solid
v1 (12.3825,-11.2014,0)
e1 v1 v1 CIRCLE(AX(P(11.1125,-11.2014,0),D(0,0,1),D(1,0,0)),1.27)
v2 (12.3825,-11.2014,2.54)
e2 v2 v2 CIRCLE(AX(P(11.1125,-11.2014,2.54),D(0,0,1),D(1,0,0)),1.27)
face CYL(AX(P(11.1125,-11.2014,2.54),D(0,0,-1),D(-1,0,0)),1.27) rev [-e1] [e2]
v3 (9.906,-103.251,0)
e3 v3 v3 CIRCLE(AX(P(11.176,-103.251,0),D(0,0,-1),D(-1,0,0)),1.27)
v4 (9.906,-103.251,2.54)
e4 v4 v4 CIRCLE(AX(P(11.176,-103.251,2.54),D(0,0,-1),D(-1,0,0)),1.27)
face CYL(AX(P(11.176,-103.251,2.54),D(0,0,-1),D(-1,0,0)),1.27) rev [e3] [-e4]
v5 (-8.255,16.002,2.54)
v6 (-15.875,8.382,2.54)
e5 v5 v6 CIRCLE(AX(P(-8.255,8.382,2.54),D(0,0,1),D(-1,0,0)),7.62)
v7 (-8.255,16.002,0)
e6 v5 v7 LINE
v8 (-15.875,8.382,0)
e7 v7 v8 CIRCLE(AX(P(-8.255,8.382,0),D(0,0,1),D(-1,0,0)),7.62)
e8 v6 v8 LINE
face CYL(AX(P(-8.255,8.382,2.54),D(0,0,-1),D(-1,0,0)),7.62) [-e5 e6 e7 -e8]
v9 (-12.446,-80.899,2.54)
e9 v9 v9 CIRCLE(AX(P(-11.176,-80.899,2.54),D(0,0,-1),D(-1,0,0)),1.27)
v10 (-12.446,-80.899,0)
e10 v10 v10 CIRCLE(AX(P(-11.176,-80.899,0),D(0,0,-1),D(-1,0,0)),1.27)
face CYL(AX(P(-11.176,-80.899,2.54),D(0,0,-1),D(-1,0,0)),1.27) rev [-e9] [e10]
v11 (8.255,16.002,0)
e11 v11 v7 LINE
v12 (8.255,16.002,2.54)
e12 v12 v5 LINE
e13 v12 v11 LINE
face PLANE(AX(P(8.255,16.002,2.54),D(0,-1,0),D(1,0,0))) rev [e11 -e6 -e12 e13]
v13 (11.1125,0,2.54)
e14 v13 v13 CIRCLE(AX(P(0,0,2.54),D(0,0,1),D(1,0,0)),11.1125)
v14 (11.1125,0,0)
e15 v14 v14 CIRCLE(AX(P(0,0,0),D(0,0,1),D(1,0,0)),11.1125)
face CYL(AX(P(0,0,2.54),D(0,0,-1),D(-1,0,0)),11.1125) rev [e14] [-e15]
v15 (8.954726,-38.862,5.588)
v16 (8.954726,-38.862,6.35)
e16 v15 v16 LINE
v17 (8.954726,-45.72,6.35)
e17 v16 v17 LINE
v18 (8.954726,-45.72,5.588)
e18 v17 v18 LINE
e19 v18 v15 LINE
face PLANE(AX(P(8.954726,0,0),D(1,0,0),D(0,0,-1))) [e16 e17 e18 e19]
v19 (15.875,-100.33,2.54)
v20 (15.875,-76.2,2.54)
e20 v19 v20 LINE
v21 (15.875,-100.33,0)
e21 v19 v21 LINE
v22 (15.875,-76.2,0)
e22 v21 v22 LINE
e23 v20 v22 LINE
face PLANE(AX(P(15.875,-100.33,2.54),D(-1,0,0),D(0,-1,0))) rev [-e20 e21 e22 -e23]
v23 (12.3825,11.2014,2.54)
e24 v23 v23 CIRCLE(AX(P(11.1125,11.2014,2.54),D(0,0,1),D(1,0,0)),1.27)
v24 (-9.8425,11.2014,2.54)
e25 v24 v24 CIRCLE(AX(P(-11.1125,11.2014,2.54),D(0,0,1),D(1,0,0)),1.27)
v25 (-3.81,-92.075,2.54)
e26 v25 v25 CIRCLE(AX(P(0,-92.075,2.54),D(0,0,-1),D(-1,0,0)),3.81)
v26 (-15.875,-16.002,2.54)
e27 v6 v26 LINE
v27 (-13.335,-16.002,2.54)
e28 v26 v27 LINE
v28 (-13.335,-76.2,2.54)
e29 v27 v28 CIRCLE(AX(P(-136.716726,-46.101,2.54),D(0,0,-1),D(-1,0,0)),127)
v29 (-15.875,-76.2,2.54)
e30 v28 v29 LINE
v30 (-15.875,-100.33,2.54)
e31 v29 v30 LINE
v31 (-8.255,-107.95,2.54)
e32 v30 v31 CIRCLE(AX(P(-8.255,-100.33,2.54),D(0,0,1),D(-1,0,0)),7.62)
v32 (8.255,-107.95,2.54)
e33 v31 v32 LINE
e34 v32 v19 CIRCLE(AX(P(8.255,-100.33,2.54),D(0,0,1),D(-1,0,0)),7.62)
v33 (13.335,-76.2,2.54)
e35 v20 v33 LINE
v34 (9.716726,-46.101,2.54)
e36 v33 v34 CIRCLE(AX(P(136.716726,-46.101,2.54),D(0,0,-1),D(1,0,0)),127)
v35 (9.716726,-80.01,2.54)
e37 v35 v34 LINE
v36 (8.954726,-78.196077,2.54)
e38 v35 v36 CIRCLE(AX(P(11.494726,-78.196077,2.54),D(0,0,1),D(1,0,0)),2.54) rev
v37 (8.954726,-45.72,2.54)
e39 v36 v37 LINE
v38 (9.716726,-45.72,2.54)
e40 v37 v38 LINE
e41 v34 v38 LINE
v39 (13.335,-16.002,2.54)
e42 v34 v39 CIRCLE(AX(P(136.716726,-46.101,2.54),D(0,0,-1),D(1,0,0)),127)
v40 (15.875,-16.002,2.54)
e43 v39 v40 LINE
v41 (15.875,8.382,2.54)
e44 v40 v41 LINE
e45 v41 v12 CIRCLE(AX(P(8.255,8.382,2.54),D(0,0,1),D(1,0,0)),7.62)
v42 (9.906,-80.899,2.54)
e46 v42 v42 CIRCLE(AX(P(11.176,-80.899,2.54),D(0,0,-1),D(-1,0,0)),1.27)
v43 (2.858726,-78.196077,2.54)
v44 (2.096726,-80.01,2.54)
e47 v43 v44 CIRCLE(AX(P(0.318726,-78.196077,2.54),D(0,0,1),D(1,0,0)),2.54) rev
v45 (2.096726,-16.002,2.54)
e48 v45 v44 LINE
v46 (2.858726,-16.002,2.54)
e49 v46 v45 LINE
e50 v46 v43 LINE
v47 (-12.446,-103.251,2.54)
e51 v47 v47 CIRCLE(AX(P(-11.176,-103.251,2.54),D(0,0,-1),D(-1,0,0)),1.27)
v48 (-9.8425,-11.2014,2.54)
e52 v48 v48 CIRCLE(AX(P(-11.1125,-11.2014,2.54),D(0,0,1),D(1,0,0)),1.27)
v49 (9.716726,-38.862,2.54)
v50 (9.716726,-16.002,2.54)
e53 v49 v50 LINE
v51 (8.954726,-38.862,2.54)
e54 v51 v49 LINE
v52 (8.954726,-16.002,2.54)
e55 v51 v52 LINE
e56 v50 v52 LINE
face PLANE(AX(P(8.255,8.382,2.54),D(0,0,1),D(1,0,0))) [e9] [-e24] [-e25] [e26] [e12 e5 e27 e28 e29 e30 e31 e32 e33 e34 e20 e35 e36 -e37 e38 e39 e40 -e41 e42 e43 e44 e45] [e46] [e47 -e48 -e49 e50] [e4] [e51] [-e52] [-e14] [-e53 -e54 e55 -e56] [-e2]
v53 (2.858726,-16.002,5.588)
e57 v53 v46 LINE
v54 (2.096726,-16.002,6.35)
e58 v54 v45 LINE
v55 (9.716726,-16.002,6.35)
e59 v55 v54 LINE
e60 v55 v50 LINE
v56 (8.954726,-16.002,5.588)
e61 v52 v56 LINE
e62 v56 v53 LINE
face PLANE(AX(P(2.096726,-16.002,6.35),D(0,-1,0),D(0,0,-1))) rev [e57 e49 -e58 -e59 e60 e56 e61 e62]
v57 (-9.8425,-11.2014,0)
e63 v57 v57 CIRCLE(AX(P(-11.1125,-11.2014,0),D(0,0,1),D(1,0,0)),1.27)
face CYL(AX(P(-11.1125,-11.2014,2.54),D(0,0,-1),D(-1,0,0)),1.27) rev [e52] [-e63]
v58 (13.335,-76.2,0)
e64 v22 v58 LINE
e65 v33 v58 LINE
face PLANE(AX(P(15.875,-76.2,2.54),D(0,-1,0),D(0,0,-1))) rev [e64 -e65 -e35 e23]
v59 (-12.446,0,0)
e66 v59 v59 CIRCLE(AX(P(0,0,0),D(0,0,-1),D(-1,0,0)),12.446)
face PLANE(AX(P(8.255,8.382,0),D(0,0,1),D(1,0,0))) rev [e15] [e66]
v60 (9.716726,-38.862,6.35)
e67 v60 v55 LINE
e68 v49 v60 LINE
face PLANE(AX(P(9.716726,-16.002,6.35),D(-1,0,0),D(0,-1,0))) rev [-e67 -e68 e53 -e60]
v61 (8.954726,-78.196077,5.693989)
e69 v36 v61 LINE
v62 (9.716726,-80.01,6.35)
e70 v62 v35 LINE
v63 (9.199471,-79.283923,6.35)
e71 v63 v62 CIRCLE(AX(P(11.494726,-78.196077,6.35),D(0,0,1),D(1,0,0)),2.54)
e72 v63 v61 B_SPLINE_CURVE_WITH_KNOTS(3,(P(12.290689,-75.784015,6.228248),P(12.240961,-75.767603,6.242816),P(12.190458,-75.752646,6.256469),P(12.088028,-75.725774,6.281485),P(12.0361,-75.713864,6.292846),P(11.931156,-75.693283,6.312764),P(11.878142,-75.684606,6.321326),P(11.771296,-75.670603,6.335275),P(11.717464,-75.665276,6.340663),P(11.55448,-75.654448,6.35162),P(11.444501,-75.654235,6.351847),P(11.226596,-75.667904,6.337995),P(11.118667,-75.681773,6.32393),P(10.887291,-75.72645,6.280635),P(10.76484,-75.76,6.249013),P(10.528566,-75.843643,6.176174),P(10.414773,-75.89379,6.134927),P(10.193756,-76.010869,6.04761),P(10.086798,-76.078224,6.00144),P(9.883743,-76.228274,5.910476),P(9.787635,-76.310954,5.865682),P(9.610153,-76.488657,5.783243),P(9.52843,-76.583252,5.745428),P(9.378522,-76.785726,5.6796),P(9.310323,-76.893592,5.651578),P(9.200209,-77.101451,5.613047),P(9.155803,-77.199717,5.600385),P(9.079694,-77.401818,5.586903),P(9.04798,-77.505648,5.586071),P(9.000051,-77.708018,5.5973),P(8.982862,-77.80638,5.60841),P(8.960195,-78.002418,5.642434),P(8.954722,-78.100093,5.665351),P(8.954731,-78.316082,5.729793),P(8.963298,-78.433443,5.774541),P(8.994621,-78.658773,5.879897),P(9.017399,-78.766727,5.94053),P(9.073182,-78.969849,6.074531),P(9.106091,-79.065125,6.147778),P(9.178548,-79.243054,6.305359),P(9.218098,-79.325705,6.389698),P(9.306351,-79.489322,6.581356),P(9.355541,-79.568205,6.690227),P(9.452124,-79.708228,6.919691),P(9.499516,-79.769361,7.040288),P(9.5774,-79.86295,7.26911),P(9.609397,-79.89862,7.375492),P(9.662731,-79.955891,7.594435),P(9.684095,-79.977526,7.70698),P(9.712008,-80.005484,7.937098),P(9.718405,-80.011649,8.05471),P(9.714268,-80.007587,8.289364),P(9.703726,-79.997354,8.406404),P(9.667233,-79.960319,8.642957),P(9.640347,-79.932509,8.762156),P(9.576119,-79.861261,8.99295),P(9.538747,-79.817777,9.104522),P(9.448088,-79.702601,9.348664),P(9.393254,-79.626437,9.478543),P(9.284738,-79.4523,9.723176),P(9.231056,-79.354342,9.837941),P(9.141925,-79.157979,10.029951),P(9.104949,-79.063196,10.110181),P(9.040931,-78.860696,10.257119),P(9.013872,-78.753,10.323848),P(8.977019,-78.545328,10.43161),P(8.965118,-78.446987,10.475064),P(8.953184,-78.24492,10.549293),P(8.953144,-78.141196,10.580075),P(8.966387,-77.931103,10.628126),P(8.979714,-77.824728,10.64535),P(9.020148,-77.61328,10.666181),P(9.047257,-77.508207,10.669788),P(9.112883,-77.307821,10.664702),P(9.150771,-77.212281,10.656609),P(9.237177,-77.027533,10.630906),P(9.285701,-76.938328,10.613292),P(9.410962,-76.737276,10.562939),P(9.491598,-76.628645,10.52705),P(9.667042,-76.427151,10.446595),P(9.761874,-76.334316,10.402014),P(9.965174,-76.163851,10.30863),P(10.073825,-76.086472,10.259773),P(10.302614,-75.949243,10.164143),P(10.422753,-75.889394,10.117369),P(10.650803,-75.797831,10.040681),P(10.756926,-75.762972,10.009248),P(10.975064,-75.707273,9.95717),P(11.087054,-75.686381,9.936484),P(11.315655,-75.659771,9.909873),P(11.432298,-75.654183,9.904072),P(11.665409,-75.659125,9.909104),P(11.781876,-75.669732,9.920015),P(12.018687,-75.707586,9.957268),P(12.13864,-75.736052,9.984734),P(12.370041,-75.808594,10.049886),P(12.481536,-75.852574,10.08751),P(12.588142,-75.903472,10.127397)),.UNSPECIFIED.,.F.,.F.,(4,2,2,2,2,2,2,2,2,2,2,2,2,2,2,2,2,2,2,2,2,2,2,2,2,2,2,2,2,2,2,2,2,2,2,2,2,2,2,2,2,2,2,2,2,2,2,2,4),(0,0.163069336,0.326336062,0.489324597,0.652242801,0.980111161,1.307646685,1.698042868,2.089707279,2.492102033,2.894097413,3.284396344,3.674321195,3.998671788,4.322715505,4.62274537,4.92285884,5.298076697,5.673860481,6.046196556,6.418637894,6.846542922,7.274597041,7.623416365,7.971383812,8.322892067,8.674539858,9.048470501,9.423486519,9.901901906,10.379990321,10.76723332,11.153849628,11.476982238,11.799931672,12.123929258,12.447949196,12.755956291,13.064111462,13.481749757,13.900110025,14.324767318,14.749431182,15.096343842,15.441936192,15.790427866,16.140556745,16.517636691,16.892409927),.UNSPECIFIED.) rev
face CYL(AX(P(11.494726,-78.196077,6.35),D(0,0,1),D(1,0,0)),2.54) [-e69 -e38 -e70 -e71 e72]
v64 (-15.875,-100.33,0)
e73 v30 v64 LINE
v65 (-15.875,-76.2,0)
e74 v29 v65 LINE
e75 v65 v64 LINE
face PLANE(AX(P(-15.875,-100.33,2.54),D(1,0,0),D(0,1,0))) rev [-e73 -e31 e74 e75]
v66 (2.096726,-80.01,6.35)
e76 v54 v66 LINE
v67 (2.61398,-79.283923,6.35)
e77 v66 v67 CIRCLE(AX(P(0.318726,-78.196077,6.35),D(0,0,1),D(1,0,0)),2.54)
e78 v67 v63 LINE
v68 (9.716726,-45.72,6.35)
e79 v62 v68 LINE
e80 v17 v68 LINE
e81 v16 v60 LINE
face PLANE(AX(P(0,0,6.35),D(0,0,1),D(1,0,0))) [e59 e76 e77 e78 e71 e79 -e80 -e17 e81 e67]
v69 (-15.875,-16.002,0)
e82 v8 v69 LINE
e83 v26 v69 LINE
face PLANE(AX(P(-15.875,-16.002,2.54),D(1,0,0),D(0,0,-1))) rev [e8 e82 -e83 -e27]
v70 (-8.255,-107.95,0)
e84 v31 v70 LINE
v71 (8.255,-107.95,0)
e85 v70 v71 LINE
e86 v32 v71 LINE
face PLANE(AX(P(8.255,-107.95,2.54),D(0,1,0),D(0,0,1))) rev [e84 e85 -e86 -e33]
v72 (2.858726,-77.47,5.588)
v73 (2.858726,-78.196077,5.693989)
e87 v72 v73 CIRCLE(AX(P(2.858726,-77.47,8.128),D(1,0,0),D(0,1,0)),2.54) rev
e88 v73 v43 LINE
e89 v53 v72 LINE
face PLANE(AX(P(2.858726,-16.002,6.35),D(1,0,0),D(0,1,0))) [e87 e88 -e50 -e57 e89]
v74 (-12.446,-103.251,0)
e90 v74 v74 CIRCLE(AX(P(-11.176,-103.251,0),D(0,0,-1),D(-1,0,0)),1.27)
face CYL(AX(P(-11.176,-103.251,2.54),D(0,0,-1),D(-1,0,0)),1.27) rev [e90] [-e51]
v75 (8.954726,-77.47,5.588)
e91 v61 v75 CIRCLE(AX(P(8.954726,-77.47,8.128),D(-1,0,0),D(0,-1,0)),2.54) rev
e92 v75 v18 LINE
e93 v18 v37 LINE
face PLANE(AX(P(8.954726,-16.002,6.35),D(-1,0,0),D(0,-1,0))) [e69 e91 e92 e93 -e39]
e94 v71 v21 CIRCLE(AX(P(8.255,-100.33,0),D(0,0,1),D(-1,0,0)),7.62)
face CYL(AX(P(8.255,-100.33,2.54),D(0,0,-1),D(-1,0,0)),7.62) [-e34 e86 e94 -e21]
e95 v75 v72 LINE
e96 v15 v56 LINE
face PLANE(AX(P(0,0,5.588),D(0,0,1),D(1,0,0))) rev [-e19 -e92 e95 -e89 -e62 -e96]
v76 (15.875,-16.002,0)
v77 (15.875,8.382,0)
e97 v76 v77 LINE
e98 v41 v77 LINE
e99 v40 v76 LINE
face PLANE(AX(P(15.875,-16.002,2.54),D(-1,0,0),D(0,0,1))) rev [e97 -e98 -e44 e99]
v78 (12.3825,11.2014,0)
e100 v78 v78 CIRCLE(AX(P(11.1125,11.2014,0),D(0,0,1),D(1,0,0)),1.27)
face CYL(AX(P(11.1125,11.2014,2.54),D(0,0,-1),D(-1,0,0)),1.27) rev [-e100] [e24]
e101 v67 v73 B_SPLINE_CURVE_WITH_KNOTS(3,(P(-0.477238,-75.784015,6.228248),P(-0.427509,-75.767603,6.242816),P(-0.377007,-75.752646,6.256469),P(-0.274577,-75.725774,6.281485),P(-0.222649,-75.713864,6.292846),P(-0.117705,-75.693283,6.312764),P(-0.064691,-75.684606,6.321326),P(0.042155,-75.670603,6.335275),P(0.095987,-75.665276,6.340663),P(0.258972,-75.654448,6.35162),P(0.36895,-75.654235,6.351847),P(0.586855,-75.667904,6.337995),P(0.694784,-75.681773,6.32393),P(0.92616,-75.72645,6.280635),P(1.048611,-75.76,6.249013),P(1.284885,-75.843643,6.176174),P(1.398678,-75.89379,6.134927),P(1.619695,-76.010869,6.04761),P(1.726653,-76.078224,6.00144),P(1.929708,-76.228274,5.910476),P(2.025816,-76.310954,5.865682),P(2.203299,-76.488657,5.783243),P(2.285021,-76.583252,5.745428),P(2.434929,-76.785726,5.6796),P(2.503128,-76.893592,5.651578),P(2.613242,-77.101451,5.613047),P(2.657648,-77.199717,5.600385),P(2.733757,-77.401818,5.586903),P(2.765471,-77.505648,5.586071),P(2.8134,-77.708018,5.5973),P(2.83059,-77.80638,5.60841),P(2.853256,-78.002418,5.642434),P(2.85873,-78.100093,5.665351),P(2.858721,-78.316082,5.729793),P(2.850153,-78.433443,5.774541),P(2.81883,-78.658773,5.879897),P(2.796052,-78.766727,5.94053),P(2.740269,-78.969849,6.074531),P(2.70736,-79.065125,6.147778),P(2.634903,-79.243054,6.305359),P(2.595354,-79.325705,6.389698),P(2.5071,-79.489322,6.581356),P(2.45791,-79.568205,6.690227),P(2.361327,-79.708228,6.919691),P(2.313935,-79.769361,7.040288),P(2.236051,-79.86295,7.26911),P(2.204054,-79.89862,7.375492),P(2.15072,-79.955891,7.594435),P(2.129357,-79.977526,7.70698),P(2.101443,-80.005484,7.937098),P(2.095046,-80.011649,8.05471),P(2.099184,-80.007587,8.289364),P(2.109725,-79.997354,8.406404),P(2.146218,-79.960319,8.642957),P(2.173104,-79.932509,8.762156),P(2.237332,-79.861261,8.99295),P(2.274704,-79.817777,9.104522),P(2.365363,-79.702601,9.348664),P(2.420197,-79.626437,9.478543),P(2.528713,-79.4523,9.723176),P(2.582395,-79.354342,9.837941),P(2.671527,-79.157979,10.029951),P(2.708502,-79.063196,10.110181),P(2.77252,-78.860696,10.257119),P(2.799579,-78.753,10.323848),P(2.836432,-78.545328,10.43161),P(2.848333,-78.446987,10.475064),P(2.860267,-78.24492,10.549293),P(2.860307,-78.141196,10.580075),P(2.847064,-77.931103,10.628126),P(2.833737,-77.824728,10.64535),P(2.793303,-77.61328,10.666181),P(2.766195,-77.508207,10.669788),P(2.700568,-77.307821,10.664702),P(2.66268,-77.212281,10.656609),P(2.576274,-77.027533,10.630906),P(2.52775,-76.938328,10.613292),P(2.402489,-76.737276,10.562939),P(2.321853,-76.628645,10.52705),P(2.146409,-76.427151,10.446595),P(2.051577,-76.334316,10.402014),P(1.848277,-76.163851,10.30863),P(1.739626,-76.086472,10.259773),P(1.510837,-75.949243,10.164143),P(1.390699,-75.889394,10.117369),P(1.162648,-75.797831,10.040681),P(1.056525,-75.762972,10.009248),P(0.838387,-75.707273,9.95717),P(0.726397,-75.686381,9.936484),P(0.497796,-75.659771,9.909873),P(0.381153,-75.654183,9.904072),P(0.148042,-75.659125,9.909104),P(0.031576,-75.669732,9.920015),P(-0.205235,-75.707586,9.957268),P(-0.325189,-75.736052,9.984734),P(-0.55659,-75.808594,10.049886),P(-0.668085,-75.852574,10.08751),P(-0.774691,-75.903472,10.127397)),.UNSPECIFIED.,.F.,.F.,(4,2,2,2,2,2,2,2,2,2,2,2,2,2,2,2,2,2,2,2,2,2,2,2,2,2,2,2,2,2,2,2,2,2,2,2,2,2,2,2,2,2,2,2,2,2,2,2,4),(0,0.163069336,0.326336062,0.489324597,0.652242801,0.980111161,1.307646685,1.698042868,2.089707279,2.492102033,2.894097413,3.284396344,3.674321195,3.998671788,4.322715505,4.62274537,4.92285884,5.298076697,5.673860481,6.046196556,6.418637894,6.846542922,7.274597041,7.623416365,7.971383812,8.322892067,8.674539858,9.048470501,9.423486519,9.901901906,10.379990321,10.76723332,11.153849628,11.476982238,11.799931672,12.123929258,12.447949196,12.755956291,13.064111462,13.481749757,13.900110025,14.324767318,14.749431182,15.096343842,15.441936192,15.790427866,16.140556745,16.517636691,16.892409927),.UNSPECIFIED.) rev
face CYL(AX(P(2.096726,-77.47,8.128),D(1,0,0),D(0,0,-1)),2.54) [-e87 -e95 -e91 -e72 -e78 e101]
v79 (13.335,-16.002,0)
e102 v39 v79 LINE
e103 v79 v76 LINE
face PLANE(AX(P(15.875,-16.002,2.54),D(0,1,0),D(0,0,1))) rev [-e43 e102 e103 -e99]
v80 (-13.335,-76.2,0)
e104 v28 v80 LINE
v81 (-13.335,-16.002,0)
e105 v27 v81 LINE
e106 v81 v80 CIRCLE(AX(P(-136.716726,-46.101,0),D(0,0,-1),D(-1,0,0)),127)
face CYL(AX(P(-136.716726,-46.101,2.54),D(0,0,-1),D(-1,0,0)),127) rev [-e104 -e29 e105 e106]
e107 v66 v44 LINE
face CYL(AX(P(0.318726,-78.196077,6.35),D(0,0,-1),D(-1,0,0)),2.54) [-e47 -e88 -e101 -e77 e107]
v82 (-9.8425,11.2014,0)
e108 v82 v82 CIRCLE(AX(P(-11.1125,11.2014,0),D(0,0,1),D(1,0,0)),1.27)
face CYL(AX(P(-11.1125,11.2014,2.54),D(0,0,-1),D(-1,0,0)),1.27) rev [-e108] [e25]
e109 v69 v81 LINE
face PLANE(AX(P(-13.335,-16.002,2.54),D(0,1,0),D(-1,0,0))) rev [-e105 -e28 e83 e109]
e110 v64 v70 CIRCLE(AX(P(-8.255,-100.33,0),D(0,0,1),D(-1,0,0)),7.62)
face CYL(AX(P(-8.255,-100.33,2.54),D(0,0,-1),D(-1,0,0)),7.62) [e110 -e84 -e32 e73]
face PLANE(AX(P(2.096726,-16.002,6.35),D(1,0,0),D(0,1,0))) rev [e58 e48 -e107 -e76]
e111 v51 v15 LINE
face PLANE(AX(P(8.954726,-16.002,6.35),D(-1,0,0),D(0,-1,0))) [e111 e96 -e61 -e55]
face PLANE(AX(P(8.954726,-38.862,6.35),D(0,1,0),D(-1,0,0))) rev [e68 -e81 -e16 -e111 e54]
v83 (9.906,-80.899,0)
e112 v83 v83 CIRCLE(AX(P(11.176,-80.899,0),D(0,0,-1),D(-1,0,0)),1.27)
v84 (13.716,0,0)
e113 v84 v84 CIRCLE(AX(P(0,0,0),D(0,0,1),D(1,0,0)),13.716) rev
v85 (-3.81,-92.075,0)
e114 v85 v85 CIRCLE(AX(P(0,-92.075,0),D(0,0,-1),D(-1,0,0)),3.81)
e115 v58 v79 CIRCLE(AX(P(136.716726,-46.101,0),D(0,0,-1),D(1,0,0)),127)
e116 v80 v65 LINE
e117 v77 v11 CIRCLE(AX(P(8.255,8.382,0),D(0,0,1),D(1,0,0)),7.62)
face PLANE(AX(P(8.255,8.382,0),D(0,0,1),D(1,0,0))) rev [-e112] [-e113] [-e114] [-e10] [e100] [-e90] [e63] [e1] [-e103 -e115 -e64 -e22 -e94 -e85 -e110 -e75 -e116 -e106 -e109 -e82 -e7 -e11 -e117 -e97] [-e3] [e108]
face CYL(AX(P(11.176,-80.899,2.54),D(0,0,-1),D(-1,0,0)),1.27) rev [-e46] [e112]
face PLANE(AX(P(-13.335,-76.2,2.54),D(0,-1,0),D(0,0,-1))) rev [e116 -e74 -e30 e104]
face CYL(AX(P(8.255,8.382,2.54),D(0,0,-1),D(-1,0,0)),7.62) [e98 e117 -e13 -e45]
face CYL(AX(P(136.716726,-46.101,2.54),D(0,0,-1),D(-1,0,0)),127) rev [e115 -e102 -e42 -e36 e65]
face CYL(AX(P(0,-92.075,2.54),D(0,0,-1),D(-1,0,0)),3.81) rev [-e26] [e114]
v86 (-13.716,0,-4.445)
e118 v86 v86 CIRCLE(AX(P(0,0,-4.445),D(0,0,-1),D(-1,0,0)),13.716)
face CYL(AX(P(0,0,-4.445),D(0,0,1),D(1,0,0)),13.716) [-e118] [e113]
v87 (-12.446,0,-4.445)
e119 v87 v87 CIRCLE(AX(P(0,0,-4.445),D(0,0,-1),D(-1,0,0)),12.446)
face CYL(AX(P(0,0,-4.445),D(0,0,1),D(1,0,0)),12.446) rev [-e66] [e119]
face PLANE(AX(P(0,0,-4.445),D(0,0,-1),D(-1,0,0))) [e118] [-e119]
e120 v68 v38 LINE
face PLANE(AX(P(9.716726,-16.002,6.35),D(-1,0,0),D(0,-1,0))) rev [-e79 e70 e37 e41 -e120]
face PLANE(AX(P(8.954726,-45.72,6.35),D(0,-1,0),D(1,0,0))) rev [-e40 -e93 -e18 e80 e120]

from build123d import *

# Parameters (mm, degrees)
SKETCH1_R           = 11.1125
SKETCH1_R_2         = 1.27
BOSS_EXTRUDE1_DEPTH = 2.54
SKETCH2_R           = 1.27
SKETCH2_R_2         = 3.81
CUT_EXTRUDE1_DEPTH  = 2.54
SKETCH3_R           = 13.716
SKETCH3_R_2         = 12.446
BOSS_EXTRUDE2_DEPTH = 4.445
SKETCH4_W           = 7.62
SKETCH4_H           = 64.008
SKETCH4_W_2         = 6.096
SKETCH4_H_2         = 62.484
EXTRUDE_THIN1_DEPTH = 3.81
SKETCH5_W           = 6.096
SKETCH5_H           = 3.81
CUT_EXTRUDE2_DEPTH  = 76.2
SKETCH6_W           = 7.62
SKETCH6_H           = 64.008
BOSS_EXTRUDE3_DEPTH = 0.762
FILLET1_R           = 2.54
SKETCH7_W           = 3.81
SKETCH7_H           = 6.858
CUT_EXTRUDE3_DEPTH  = 0.762


with BuildPart() as part:
    # Sketch1 → Boss-Extrude1 (new body)
    with BuildSketch(Plane.XY):
        with BuildLine():
            Line((-13.335, -76.2), (-15.875, -76.2))
            Line((-15.875, -76.2), (-15.875, -100.33))
            ThreePointArc((-15.875, -100.33), (-13.643153673, -105.718153673), (-8.255, -107.95))
            Line((-8.255, -107.95), (8.255, -107.95))
            ThreePointArc((8.255, -107.95), (13.643153673, -105.718153673), (15.875, -100.33))
            Line((15.875, -100.33), (15.875, -76.2))
            Line((15.875, -76.2), (13.335, -76.2))
            ThreePointArc((13.335, -76.2), (9.716725547, -46.101), (13.335, -16.002))
            Line((13.335, -16.002), (15.875, -16.002))
            Line((15.875, -16.002), (15.875, 8.382))
            ThreePointArc((15.875, 8.382), (13.643153673, 13.770153673), (8.255, 16.002))
            Line((8.255, 16.002), (-8.255, 16.002))
            ThreePointArc((-8.255, 16.002), (-13.643153673, 13.770153673), (-15.875, 8.382))
            Line((-15.875, 8.382), (-15.875, -16.002))
            Line((-15.875, -16.002), (-13.335, -16.002))
            ThreePointArc((-13.335, -16.002), (-9.716725547, -46.101), (-13.335, -76.2))
        make_face()
        Circle(SKETCH1_R, mode=Mode.SUBTRACT)
        with Locations((11.1125, 11.2014)):
            Circle(SKETCH1_R_2, mode=Mode.SUBTRACT)
        with Locations((11.1125, -11.2014)):
            Circle(SKETCH1_R_2, mode=Mode.SUBTRACT)
        with Locations((-11.1125, -11.2014)):
            Circle(SKETCH1_R_2, mode=Mode.SUBTRACT)
        with Locations((-11.1125, 11.2014)):
            Circle(SKETCH1_R_2, mode=Mode.SUBTRACT)
    extrude(amount=BOSS_EXTRUDE1_DEPTH)

    # Sketch2 → Cut-Extrude1 (cut)
    with BuildSketch(Plane(origin=(0, 0, 0), x_dir=(-1, 0, 0), z_dir=(0, 0, -1))):
        with Locations((-11.176, -80.899)):
            Circle(SKETCH2_R)
        with Locations((11.176, -80.899)):
            Circle(SKETCH2_R)
        with Locations((11.176, -103.251)):
            Circle(SKETCH2_R)
        with Locations((-11.176, -103.251)):
            Circle(SKETCH2_R)
        with Locations((0, -92.075)):
            Circle(SKETCH2_R_2)
    extrude(amount=-CUT_EXTRUDE1_DEPTH, mode=Mode.SUBTRACT)

    # Sketch3 → Boss-Extrude2 (add)
    with BuildSketch(Plane(origin=(0, 0, 0), x_dir=(-1, 0, 0), z_dir=(0, 0, -1))):
        with Locations(Location((0, 0, 0), (0, 0, 180))):
            Circle(SKETCH3_R)
        Circle(SKETCH3_R_2, mode=Mode.SUBTRACT)
    extrude(amount=BOSS_EXTRUDE2_DEPTH)

    # Sketch4 → Extrude-Thin1 (add)
    with BuildSketch(Plane.XY.offset(2.54)):
        with Locations((5.906725547, -48.006)):
            Rectangle(SKETCH4_W, SKETCH4_H)
        with Locations((5.906725547, -48.006)):
            Rectangle(SKETCH4_W_2, SKETCH4_H_2, mode=Mode.SUBTRACT)
    extrude(amount=EXTRUDE_THIN1_DEPTH)

    # Sketch5 → Cut-Extrude2 (cut)
    with BuildSketch(Plane.XZ.offset(80.01)):
        with Locations((5.906725547, 4.445)):
            Rectangle(SKETCH5_W, SKETCH5_H)
    extrude(amount=-CUT_EXTRUDE2_DEPTH, mode=Mode.SUBTRACT)

    # Sketch6 → Boss-Extrude3 (add)
    with BuildSketch(Plane.XY.offset(6.35)):
        with Locations((5.906725547, -48.006)):
            Rectangle(SKETCH6_W, SKETCH6_H)
    extrude(amount=-BOSS_EXTRUDE3_DEPTH)

    # Fillet1
    # the kernel refuses this fillet: 2.54 mm, written as the material it takes off along each edge
    with BuildSketch(Plane(origin=(8.954725547, -80.01, 5.588), x_dir=(0, 1, 0), z_dir=(0, 0, -1)), Plane(origin=(2.858725547, -80.01, 2.54), x_dir=(0, 1, 0), z_dir=(0, 0, 1))) as fillet1_piece_1:
        with BuildLine():
            CenterArc((1.813922821, 2.54), FILLET1_R, 224.427004001, 45.572995999)
            Line((0, 0.762), (0, 0))
            Line((0, 0), (1.813922821, 0))
        make_face()
    extrude(amount=3.048, mode=Mode.SUBTRACT)
    with BuildSketch(Plane(origin=(8.954725547, -80.01, 5.588), x_dir=(0, 1, 0), z_dir=(-1, 0, 0))) as fillet1_piece_2:
        with BuildLine():
            CenterArc((FILLET1_R, -FILLET1_R), FILLET1_R, 90, 90)
            Line((0, -FILLET1_R), (0, 0))
            Line((0, 0), (FILLET1_R, 0))
        make_face()
    extrude(amount=6.096, mode=Mode.SUBTRACT)
    with BuildSketch(Plane(origin=(15.304725547, -80.01, 5.588), x_dir=(0, 1, 0), z_dir=(-1, 0, 0))) as fillet1_piece_3a_section:
        with BuildLine():
            CenterArc((FILLET1_R, -FILLET1_R), FILLET1_R, 90, 90)
            Line((0, -FILLET1_R), (0, 0))
            Line((0, 0), (FILLET1_R, 0))
        make_face()
    fillet1_piece_3a = extrude(amount=12.446, mode=Mode.PRIVATE)
    fillet1_piece_3a = split(fillet1_piece_3a, bisect_by=Plane(origin=(15.304725547, -80.01, 6.35), z_dir=(0, 0, -1)), keep=Keep.TOP, mode=Mode.PRIVATE)
    fillet1_piece_3a = split(fillet1_piece_3a, bisect_by=Plane(origin=(8.954725547, -80.01, 5.588), z_dir=(1, 0, 0)), keep=Keep.TOP, mode=Mode.PRIVATE)
    fillet1_piece_3a = split(fillet1_piece_3a, bisect_by=Plane(origin=(9.716725547, -80.01, 5.588), z_dir=(-1, 0, 0)), keep=Keep.TOP, mode=Mode.PRIVATE)
    with BuildSketch(Plane(origin=(8.954725547, -80.01, 10.122807052), x_dir=(0, 1, 0), z_dir=(0, 0, -1))) as fillet1_piece_3b_section:
        with BuildLine():
            CenterArc((1.813922821, 2.54), FILLET1_R, 224.427004001, 45.572995999)
            Line((0, 0.762), (0, 0))
            Line((0, 0), (1.813922821, 0))
        make_face()
    fillet1_piece_3b = extrude(amount=7.582807052, mode=Mode.PRIVATE)
    fillet1_piece_3b = split(fillet1_piece_3b, bisect_by=Plane(origin=(8.954725547, -80.01, 6.35), z_dir=(0, 0, -1)), keep=Keep.TOP, mode=Mode.PRIVATE)
    fillet1_piece_3b = split(fillet1_piece_3b, bisect_by=Plane(origin=(8.954725547, -80.01, 5.588), z_dir=(0, 0, 1)), keep=Keep.TOP, mode=Mode.PRIVATE)
    fillet1_piece_3 = fillet1_piece_3a & fillet1_piece_3b
    add(fillet1_piece_3, mode=Mode.SUBTRACT)
    with BuildSketch(Plane(origin=(2.858725547, -80.01, 2.54), x_dir=(0, 1, 0), z_dir=(0, 0, 1))) as fillet1_piece_4a_section:
        with BuildLine():
            CenterArc((1.813922821, 2.54), FILLET1_R, 224.427004001, 45.572995999)
            Line((0, 0.762), (0, 0))
            Line((0, 0), (1.813922821, 0))
        make_face()
    fillet1_piece_4a = extrude(amount=7.582807052, mode=Mode.PRIVATE)
    fillet1_piece_4a = split(fillet1_piece_4a, bisect_by=Plane(origin=(2.858725547, -80.01, 6.35), z_dir=(0, 0, -1)), keep=Keep.TOP, mode=Mode.PRIVATE)
    fillet1_piece_4a = split(fillet1_piece_4a, bisect_by=Plane(origin=(2.858725547, -80.01, 5.588), z_dir=(0, 0, 1)), keep=Keep.TOP, mode=Mode.PRIVATE)
    with BuildSketch(Plane(origin=(8.954725547, -80.01, 5.588), x_dir=(0, 1, 0), z_dir=(-1, 0, 0))) as fillet1_piece_4b_section:
        with BuildLine():
            CenterArc((FILLET1_R, -FILLET1_R), FILLET1_R, 90, 90)
            Line((0, -FILLET1_R), (0, 0))
            Line((0, 0), (FILLET1_R, 0))
        make_face()
    fillet1_piece_4b = extrude(amount=12.446, mode=Mode.PRIVATE)
    fillet1_piece_4b = split(fillet1_piece_4b, bisect_by=Plane(origin=(2.096725547, -80.01, 5.588), z_dir=(1, 0, 0)), keep=Keep.TOP, mode=Mode.PRIVATE)
    fillet1_piece_4b = split(fillet1_piece_4b, bisect_by=Plane(origin=(8.954725547, -80.01, 6.35), z_dir=(0, 0, -1)), keep=Keep.TOP, mode=Mode.PRIVATE)
    fillet1_piece_4b = split(fillet1_piece_4b, bisect_by=Plane(origin=(2.858725547, -80.01, 5.588), z_dir=(-1, 0, 0)), keep=Keep.TOP, mode=Mode.PRIVATE)
    fillet1_piece_4 = fillet1_piece_4a & fillet1_piece_4b
    add(fillet1_piece_4, mode=Mode.SUBTRACT)

    # Sketch7 → Cut-Extrude3 (cut)
    with BuildSketch(Plane(origin=(9.716725547, 0, 0), x_dir=(0, 0, -1), z_dir=(1, 0, 0))):
        with Locations((-4.445, -42.291)):
            Rectangle(SKETCH7_W, SKETCH7_H)
    extrude(amount=-CUT_EXTRUDE3_DEPTH, mode=Mode.SUBTRACT)


solid = part.part
